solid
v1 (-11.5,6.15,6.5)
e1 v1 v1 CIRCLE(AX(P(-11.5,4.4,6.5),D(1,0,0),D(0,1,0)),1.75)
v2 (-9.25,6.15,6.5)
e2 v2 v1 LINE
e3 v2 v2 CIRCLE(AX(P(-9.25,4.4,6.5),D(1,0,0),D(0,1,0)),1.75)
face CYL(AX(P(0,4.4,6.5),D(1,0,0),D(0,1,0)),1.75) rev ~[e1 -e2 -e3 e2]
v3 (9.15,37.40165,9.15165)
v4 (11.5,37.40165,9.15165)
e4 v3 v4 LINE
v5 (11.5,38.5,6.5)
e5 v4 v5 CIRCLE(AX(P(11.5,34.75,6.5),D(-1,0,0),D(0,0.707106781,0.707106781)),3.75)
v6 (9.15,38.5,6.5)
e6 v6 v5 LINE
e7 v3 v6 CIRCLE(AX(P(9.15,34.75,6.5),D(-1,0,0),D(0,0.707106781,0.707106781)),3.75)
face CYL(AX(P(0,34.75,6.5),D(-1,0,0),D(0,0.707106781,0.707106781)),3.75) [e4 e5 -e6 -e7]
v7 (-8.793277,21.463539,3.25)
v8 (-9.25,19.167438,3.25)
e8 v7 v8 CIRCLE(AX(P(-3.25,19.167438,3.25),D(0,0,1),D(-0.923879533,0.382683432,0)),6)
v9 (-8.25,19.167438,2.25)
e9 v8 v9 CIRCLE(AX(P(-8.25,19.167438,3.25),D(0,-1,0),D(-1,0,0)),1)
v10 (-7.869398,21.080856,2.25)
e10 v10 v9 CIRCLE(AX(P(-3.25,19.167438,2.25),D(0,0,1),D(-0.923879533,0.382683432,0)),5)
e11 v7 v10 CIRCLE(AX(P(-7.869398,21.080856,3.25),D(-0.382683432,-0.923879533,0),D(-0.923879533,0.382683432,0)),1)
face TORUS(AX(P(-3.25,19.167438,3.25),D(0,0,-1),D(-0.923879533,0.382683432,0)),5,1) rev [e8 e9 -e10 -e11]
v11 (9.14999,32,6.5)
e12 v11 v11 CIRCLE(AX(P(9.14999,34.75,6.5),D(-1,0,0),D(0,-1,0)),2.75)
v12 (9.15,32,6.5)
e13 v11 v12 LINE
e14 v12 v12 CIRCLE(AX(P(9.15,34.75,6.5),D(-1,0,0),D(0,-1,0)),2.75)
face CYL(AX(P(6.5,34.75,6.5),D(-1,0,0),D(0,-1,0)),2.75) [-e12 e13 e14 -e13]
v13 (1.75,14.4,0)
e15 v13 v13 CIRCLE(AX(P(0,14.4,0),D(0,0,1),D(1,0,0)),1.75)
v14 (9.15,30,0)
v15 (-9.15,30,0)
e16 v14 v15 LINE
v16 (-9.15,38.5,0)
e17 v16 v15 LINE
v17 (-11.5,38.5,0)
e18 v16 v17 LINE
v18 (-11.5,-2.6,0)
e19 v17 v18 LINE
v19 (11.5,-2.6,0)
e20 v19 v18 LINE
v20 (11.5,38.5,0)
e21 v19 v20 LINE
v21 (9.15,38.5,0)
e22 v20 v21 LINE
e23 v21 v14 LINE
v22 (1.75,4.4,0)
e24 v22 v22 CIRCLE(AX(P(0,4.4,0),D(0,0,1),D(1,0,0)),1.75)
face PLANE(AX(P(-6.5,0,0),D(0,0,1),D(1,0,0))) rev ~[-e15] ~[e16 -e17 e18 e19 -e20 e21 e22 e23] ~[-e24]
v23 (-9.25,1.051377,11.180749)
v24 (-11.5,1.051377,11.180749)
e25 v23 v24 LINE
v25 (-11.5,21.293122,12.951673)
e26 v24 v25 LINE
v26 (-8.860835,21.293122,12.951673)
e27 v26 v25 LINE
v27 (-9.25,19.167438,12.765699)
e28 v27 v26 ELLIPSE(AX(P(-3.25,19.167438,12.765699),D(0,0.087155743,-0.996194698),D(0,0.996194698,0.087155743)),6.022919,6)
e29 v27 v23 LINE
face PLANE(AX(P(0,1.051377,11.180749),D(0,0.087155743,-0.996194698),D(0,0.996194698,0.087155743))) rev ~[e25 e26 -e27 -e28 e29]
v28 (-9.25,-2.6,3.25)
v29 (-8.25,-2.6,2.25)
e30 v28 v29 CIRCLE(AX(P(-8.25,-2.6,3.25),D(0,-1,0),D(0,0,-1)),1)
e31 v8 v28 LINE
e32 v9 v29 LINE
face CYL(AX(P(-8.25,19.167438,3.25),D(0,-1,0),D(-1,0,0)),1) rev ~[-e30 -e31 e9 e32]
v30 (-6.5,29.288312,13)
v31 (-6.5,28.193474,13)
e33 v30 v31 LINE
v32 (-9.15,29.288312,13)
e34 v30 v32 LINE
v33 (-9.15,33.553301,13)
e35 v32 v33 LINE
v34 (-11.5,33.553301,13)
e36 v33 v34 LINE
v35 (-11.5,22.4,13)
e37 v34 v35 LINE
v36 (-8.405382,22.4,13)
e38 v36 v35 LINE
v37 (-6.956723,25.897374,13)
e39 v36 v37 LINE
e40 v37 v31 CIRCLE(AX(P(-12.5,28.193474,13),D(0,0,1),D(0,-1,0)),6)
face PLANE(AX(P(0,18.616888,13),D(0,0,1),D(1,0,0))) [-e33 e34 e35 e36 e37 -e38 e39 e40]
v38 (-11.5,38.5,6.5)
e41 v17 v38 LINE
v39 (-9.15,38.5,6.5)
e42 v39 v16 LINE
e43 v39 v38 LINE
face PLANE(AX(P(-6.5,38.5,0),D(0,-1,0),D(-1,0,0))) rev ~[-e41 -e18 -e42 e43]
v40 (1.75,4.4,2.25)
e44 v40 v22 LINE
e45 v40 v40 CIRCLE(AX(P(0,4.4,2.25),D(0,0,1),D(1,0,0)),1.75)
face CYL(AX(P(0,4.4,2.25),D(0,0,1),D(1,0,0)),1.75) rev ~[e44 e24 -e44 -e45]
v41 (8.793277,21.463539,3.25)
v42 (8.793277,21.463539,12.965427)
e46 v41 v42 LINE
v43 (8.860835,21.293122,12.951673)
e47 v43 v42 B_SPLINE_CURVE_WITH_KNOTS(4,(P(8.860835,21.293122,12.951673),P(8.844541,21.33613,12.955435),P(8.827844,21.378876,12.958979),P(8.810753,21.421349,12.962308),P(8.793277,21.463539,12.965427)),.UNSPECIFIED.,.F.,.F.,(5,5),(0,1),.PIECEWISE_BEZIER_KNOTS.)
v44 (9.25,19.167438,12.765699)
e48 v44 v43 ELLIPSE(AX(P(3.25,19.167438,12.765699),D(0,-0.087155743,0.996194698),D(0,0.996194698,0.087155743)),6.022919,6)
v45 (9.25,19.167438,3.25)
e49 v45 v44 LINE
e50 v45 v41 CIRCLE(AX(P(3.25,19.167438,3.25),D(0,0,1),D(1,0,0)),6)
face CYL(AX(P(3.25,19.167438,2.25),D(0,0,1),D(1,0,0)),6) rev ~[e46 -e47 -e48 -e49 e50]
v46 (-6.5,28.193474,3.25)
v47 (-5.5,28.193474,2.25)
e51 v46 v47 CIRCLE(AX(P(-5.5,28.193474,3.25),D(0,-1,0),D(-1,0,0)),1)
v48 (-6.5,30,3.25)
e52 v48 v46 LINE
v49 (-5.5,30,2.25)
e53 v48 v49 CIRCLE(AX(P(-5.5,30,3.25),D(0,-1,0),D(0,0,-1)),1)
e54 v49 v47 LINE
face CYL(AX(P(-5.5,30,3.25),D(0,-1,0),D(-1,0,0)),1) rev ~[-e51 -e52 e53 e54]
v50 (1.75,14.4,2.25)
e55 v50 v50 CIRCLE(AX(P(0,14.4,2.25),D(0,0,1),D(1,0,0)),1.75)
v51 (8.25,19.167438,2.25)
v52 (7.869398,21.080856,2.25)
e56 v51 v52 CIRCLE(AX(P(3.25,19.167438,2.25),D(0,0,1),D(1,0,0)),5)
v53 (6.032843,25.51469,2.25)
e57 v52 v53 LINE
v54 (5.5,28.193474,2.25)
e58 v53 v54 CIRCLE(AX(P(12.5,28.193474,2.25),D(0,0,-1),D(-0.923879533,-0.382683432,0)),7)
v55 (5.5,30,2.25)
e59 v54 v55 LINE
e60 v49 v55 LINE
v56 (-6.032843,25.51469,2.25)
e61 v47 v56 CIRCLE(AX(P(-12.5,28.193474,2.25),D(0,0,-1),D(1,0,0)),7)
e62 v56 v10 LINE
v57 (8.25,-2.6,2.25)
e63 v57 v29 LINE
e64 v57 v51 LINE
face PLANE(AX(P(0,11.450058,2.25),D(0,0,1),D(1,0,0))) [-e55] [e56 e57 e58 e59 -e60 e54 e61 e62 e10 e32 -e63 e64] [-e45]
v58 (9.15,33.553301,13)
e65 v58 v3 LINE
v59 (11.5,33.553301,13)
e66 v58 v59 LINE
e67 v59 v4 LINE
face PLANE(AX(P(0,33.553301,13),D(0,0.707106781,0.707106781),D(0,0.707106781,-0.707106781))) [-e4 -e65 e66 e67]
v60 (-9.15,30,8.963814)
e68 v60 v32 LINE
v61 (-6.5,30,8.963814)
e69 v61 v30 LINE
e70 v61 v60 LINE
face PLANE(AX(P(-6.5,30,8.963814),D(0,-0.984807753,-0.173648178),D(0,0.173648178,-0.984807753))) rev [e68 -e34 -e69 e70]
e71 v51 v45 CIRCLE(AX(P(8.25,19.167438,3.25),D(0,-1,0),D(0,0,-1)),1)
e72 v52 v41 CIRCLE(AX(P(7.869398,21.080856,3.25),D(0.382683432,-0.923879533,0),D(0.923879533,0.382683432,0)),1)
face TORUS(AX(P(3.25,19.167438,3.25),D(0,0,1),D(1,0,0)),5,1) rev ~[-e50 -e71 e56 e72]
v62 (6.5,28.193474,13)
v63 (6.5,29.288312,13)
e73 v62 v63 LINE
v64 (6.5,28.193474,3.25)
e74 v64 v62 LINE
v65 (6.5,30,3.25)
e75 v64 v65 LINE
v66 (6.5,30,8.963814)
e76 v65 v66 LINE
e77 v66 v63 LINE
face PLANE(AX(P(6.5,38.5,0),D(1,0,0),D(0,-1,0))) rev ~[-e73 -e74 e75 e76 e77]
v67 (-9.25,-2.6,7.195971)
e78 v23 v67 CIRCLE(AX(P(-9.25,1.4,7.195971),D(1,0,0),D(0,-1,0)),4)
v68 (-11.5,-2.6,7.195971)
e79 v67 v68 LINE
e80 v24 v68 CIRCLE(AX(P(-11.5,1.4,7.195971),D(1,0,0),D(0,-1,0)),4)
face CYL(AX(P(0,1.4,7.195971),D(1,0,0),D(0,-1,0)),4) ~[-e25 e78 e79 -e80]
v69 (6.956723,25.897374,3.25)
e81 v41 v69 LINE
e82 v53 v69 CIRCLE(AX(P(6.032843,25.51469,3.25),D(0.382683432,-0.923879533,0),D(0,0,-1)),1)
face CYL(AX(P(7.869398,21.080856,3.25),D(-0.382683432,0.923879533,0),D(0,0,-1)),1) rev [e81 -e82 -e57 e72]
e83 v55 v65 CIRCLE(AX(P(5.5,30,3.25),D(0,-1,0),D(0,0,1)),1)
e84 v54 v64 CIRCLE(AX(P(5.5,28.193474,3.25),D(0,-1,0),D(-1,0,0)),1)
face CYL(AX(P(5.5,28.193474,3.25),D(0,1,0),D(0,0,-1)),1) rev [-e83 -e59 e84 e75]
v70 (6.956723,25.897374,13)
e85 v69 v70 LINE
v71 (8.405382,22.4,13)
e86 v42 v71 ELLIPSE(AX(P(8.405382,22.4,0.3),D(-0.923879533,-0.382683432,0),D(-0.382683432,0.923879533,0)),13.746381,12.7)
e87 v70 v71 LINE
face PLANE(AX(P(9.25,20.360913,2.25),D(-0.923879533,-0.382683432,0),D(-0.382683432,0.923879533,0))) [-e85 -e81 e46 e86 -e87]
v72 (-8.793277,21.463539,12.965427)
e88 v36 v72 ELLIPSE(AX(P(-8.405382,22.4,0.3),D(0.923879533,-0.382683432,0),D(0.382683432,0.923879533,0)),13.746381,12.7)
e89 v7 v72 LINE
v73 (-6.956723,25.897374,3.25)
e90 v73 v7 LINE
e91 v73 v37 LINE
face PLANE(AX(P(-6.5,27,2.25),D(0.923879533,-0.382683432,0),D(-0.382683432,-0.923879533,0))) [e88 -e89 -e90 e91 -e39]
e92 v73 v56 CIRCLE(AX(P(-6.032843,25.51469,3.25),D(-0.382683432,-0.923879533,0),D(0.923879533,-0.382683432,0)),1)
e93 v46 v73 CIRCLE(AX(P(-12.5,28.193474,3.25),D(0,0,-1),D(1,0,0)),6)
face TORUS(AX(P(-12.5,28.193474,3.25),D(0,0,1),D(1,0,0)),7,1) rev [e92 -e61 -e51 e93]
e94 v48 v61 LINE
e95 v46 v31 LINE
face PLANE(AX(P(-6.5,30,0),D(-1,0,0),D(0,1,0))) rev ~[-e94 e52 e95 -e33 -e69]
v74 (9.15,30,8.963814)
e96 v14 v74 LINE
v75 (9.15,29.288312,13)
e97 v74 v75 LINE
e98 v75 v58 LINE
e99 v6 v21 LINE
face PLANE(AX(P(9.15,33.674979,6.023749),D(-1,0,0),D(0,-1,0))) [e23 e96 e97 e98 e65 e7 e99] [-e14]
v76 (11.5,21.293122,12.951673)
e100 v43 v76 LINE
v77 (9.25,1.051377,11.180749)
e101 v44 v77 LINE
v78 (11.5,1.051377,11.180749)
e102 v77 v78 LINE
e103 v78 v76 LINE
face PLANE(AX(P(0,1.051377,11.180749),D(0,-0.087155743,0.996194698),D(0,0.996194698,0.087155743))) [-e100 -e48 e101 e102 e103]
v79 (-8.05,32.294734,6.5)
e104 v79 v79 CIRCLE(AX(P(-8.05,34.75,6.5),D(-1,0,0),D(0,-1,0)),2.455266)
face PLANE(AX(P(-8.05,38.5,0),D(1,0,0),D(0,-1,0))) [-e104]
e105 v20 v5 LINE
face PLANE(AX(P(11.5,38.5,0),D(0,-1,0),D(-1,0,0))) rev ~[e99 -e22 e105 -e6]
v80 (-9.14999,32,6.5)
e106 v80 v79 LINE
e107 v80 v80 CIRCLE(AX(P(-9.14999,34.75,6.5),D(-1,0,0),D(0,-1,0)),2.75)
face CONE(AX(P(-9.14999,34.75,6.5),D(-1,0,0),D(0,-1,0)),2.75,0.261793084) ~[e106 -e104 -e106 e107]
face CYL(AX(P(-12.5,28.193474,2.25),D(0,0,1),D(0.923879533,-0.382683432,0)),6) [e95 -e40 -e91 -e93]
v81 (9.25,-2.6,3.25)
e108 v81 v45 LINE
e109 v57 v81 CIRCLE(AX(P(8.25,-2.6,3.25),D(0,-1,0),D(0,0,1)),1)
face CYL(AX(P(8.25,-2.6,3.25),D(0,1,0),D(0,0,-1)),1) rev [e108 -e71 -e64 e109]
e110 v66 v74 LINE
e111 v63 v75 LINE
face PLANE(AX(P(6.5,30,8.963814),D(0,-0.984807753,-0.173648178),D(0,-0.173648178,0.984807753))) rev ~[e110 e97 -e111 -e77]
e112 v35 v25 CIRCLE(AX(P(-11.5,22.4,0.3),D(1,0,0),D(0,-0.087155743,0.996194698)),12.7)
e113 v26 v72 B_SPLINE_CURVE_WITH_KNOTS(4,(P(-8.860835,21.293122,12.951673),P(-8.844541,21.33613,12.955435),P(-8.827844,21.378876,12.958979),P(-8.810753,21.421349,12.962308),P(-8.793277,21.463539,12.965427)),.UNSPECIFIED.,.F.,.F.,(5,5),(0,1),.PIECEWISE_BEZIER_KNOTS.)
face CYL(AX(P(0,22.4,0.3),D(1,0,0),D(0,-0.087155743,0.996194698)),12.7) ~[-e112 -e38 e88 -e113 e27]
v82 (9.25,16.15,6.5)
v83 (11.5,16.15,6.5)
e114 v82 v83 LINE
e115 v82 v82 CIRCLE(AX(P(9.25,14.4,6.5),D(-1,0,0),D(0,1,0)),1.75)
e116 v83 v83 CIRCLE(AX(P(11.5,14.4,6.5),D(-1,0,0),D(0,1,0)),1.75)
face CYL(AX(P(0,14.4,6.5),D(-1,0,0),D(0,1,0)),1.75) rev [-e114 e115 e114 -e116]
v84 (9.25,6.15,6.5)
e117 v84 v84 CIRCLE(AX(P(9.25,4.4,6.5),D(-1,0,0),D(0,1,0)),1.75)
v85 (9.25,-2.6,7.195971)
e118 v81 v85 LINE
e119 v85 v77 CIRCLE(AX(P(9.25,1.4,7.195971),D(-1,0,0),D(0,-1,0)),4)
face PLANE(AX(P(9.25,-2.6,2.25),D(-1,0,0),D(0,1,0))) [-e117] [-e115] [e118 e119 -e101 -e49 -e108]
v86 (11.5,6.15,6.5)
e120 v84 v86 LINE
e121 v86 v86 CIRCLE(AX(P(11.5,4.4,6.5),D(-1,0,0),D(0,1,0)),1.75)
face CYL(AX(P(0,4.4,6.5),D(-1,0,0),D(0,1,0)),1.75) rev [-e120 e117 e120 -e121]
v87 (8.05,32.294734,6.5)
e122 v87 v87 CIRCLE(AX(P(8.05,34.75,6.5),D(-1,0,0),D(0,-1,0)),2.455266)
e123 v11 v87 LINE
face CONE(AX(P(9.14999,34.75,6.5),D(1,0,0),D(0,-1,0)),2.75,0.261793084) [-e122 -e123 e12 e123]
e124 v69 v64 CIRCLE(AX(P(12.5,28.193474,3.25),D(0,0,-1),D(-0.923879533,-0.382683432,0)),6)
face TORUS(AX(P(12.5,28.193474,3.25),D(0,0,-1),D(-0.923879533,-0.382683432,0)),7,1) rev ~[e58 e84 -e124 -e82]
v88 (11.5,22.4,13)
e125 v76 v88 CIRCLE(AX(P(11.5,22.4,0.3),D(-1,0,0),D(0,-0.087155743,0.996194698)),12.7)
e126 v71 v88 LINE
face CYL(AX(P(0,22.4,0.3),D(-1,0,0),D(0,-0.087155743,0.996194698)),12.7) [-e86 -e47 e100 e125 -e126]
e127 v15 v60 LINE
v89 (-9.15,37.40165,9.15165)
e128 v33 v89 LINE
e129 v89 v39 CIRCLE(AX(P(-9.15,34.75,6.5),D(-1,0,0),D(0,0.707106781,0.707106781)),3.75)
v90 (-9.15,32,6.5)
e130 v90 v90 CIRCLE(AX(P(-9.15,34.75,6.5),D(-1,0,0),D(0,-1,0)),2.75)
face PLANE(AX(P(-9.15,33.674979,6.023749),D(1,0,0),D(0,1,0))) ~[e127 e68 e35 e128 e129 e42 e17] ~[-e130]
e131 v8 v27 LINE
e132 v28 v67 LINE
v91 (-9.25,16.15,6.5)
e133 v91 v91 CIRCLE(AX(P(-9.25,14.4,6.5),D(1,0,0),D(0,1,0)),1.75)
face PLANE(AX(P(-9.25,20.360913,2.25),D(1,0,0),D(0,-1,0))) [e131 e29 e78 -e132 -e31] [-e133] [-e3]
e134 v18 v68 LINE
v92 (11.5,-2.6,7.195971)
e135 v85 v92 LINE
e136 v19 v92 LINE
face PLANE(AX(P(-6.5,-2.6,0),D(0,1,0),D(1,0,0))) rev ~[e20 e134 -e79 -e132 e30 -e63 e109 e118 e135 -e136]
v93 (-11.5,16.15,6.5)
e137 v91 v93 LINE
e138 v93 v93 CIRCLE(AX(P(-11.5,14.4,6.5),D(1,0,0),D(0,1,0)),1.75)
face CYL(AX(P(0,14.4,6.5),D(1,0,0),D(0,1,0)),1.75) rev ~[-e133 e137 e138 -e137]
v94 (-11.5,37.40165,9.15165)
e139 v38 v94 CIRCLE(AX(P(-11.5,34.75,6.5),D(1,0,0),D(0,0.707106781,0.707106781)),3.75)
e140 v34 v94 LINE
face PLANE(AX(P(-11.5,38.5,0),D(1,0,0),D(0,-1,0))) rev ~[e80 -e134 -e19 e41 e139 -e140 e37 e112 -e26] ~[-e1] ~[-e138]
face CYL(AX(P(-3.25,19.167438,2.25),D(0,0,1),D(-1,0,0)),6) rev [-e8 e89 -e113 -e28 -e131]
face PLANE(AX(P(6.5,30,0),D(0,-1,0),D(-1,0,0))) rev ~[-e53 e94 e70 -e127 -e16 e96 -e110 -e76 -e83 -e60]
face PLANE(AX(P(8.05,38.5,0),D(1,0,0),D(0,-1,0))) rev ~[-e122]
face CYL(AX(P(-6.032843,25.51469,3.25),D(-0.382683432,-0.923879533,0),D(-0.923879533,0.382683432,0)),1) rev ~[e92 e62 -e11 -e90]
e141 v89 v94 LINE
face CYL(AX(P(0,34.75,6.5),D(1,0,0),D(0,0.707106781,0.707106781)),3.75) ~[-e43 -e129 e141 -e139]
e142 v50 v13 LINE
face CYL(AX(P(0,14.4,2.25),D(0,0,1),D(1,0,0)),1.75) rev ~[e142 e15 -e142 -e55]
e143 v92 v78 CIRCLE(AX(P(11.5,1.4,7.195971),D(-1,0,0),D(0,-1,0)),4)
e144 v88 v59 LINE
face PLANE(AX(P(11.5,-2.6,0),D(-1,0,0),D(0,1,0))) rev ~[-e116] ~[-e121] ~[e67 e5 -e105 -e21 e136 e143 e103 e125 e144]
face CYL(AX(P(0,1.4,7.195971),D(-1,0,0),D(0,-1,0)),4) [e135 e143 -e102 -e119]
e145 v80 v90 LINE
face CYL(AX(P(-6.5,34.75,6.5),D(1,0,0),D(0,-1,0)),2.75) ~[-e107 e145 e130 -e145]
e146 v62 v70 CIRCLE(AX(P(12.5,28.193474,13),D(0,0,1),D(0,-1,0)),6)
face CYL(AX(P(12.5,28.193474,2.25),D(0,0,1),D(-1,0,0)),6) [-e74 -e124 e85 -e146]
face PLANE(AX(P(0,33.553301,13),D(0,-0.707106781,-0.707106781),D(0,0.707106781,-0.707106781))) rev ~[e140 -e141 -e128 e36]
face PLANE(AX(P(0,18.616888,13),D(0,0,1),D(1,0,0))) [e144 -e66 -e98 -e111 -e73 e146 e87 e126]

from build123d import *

# Parameters (mm, degrees)
F1_DEPTH      = 13
F2_W          = 13
F2_H          = 10.75
F3_DEPTH      = 38.501
F4_R          = 1.75
F5_DEPTH      = 11.501
F5_DEPTH_BACK = 11.501
F6_R          = 2.75
F7_DEPTH      = 2.65
F8_DEPTH      = 1.55
F8_DEPTH_BACK = 14.55
F9_SIZE2      = 0.294734
F9_SIZE       = 1.09999
F10_DEPTH     = 2.6
F12_DEPTH     = 10.751
F13_R         = 6
F14_R         = 1
F15_R         = 1.75
F16_DEPTH     = 2.251


# Not quite as in the source:
# - a fillet or chamfer is up to 0.001 mm smaller than in the source, because OpenCascade refuses the exact size
# - a pattern or mirror of a feature is missing from the dataset's text; its kind, count and spacing are read off the source's solid


with BuildPart() as f1:
    # F0 (on Top) → F1 (new body)
    with BuildSketch(Plane.XY):
        Polygon((6.5, 30), (0, 30), (-6.5, 30), (-6.5, 38.5), (-11.5, 38.5), (-11.5, -2.6), (-6.5, -2.6), (-6.5, 0), (0, 0), (6.5, 0), (6.5, -2.6), (11.5, -2.6), (11.5, 38.5), (6.5, 38.5), align=None)
    extrude(amount=F1_DEPTH)

    # F2 (on Front) → F3 (cut, through all)
    with BuildSketch(Plane.XZ):
        with Locations((0, 7.625)):
            Rectangle(F2_W, F2_H)
    extrude(amount=-F3_DEPTH, mode=Mode.SUBTRACT)

    # F4 (on Right) → F5 (cut, two sides)
    with BuildSketch(Plane.YZ) as f5_sk:
        with BuildLine():
            Line((38.5, 6.5), (38.5, 13))
            Line((38.5, 13), (33.5533008589, 13))
            Line((33.5533008589, 13), (37.4016504294, 9.1516504294))
            ThreePointArc((37.4016504294, 9.1516504294), (38.2145482469, 7.9350628714), (38.5, 6.5))
        make_face()
        with Locations((4.4, 6.5)):
            Circle(F4_R)
        with Locations((14.4, 6.5)):
            Circle(F4_R)
        with BuildLine():
            ThreePointArc((21.2931220671, 12.9516726658), (21.8460337805, 12.9879124141), (22.4, 13))
            Line((22.4, 13), (-2.6, 13))
            Line((-2.6, 13), (-2.6, 7.1959706526))
            ThreePointArc((-2.6, 7.1959706526), (-1.5491093472, 9.898331483), (1.051377029, 11.1807494449))
            Line((1.051377029, 11.1807494449), (21.2931220671, 12.9516726658))
        make_face()
    extrude(amount=-F5_DEPTH, mode=Mode.SUBTRACT)
    extrude(f5_sk.sketch, amount=F5_DEPTH_BACK, mode=Mode.SUBTRACT)

    # F6 (on face) → F7 (cut)
    with BuildSketch(Plane(origin=(6.5, 0, 0), x_dir=(0, -1, 0), z_dir=(-1, 0, 0))):
        with BuildLine():
            Line((-38.5, 0), (-30, 0))
            Line((-30, 0), (-30, 8.9638140898))
            Line((-30, 8.9638140898), (-29.2883115249, 13))
            Line((-29.2883115249, 13), (-33.5533008589, 13))
            Line((-33.5533008589, 13), (-37.4016504294, 9.1516504294))
            ThreePointArc((-37.4016504294, 9.1516504294), (-38.2145482469, 7.9350628714), (-38.5, 6.5))
            Line((-38.5, 6.5), (-38.5, 0))
        make_face()
        with Locations((-34.75, 6.5)):
            Circle(F6_R, mode=Mode.SUBTRACT)
    f7 = extrude(amount=-F7_DEPTH, mode=Mode.SUBTRACT)

    # F7_copies: F7 across plane
    add(f7.mirror(Plane(origin=(0, 0, 0), x_dir=(0, 0, -1), z_dir=(-1, 0, 0))), mode=Mode.SUBTRACT)

    # F8 (cut, two sides): a face of the model
    f8_faces = [f1.faces().sort_by_distance(p)[0] for p in [
        (6.5, 34.75, 6.5),
    ]]
    extrude(f8_faces, amount=-F8_DEPTH, mode=Mode.SUBTRACT)
    extrude(f8_faces, amount=F8_DEPTH_BACK, mode=Mode.SUBTRACT)

    # F9 (size 1.1 and 0.2947441117 in the source; OpenCascade refuses exactly that, so slightly less here)
    f9_edges = [f1.edges().sort_by_distance(p)[0] for p in [
        (8.05, 37.5, 6.5),
        (-8.05, 37.5, 6.5),
    ]]
    chamfer(f9_edges, length=F9_SIZE, length2=F9_SIZE2)

    # F10 (add, through all): a face of the model
    f10_faces = [f1.faces().sort_by_distance(p)[0] for p in [
        (0, 0, 1.125),
    ]]
    extrude(f10_faces, amount=F10_DEPTH)

    # F11 (on face) → F12 (cut, through all)
    with BuildSketch(Plane.XY.offset(2.25)):
        Polygon((-9.25, -2.6), (9.25, -2.6), (9.25, 20.3609127035), (6.5, 27), (-6.5, 27), (-9.25, 20.3609127035), align=None)
    extrude(amount=F12_DEPTH, mode=Mode.SUBTRACT)

    # F13
    f13_edges = [f1.edges().sort_by_distance(p)[0] for p in [
        (6.5, 27, 7.625),
        (9.25, 20.360913, 7.560057),
        (-6.5, 27, 7.625),
        (-9.25, 20.360913, 7.560057),
    ]]
    fillet(f13_edges, radius=F13_R)

    # F14
    f14_edges = [f1.edges().sort_by_distance(p)[0] for p in [
        (9.25, 8.283719, 2.25),
        (-9.25, 8.283719, 2.25),
        (6.5, 29.096737, 2.25),
        (6.615288, 27.022932, 2.25),
        (7.875, 23.680456, 2.25),
        (-6.5, 29.096737, 2.25),
        (9.134712, 20.33798, 2.25),
        (-6.615288, 27.022932, 2.25),
        (-7.875, 23.680456, 2.25),
        (-9.134712, 20.33798, 2.25),
    ]]
    fillet(f14_edges, radius=F14_R)

    # F15 (on face) → F16 (cut, through all)
    with BuildSketch(Plane.XY.offset(2.25)):
        with Locations((0, 4.4)):
            Circle(F15_R)
        with Locations((0, 14.4)):
            Circle(F15_R)
    extrude(amount=-F16_DEPTH, mode=Mode.SUBTRACT)


solid = f1.part
